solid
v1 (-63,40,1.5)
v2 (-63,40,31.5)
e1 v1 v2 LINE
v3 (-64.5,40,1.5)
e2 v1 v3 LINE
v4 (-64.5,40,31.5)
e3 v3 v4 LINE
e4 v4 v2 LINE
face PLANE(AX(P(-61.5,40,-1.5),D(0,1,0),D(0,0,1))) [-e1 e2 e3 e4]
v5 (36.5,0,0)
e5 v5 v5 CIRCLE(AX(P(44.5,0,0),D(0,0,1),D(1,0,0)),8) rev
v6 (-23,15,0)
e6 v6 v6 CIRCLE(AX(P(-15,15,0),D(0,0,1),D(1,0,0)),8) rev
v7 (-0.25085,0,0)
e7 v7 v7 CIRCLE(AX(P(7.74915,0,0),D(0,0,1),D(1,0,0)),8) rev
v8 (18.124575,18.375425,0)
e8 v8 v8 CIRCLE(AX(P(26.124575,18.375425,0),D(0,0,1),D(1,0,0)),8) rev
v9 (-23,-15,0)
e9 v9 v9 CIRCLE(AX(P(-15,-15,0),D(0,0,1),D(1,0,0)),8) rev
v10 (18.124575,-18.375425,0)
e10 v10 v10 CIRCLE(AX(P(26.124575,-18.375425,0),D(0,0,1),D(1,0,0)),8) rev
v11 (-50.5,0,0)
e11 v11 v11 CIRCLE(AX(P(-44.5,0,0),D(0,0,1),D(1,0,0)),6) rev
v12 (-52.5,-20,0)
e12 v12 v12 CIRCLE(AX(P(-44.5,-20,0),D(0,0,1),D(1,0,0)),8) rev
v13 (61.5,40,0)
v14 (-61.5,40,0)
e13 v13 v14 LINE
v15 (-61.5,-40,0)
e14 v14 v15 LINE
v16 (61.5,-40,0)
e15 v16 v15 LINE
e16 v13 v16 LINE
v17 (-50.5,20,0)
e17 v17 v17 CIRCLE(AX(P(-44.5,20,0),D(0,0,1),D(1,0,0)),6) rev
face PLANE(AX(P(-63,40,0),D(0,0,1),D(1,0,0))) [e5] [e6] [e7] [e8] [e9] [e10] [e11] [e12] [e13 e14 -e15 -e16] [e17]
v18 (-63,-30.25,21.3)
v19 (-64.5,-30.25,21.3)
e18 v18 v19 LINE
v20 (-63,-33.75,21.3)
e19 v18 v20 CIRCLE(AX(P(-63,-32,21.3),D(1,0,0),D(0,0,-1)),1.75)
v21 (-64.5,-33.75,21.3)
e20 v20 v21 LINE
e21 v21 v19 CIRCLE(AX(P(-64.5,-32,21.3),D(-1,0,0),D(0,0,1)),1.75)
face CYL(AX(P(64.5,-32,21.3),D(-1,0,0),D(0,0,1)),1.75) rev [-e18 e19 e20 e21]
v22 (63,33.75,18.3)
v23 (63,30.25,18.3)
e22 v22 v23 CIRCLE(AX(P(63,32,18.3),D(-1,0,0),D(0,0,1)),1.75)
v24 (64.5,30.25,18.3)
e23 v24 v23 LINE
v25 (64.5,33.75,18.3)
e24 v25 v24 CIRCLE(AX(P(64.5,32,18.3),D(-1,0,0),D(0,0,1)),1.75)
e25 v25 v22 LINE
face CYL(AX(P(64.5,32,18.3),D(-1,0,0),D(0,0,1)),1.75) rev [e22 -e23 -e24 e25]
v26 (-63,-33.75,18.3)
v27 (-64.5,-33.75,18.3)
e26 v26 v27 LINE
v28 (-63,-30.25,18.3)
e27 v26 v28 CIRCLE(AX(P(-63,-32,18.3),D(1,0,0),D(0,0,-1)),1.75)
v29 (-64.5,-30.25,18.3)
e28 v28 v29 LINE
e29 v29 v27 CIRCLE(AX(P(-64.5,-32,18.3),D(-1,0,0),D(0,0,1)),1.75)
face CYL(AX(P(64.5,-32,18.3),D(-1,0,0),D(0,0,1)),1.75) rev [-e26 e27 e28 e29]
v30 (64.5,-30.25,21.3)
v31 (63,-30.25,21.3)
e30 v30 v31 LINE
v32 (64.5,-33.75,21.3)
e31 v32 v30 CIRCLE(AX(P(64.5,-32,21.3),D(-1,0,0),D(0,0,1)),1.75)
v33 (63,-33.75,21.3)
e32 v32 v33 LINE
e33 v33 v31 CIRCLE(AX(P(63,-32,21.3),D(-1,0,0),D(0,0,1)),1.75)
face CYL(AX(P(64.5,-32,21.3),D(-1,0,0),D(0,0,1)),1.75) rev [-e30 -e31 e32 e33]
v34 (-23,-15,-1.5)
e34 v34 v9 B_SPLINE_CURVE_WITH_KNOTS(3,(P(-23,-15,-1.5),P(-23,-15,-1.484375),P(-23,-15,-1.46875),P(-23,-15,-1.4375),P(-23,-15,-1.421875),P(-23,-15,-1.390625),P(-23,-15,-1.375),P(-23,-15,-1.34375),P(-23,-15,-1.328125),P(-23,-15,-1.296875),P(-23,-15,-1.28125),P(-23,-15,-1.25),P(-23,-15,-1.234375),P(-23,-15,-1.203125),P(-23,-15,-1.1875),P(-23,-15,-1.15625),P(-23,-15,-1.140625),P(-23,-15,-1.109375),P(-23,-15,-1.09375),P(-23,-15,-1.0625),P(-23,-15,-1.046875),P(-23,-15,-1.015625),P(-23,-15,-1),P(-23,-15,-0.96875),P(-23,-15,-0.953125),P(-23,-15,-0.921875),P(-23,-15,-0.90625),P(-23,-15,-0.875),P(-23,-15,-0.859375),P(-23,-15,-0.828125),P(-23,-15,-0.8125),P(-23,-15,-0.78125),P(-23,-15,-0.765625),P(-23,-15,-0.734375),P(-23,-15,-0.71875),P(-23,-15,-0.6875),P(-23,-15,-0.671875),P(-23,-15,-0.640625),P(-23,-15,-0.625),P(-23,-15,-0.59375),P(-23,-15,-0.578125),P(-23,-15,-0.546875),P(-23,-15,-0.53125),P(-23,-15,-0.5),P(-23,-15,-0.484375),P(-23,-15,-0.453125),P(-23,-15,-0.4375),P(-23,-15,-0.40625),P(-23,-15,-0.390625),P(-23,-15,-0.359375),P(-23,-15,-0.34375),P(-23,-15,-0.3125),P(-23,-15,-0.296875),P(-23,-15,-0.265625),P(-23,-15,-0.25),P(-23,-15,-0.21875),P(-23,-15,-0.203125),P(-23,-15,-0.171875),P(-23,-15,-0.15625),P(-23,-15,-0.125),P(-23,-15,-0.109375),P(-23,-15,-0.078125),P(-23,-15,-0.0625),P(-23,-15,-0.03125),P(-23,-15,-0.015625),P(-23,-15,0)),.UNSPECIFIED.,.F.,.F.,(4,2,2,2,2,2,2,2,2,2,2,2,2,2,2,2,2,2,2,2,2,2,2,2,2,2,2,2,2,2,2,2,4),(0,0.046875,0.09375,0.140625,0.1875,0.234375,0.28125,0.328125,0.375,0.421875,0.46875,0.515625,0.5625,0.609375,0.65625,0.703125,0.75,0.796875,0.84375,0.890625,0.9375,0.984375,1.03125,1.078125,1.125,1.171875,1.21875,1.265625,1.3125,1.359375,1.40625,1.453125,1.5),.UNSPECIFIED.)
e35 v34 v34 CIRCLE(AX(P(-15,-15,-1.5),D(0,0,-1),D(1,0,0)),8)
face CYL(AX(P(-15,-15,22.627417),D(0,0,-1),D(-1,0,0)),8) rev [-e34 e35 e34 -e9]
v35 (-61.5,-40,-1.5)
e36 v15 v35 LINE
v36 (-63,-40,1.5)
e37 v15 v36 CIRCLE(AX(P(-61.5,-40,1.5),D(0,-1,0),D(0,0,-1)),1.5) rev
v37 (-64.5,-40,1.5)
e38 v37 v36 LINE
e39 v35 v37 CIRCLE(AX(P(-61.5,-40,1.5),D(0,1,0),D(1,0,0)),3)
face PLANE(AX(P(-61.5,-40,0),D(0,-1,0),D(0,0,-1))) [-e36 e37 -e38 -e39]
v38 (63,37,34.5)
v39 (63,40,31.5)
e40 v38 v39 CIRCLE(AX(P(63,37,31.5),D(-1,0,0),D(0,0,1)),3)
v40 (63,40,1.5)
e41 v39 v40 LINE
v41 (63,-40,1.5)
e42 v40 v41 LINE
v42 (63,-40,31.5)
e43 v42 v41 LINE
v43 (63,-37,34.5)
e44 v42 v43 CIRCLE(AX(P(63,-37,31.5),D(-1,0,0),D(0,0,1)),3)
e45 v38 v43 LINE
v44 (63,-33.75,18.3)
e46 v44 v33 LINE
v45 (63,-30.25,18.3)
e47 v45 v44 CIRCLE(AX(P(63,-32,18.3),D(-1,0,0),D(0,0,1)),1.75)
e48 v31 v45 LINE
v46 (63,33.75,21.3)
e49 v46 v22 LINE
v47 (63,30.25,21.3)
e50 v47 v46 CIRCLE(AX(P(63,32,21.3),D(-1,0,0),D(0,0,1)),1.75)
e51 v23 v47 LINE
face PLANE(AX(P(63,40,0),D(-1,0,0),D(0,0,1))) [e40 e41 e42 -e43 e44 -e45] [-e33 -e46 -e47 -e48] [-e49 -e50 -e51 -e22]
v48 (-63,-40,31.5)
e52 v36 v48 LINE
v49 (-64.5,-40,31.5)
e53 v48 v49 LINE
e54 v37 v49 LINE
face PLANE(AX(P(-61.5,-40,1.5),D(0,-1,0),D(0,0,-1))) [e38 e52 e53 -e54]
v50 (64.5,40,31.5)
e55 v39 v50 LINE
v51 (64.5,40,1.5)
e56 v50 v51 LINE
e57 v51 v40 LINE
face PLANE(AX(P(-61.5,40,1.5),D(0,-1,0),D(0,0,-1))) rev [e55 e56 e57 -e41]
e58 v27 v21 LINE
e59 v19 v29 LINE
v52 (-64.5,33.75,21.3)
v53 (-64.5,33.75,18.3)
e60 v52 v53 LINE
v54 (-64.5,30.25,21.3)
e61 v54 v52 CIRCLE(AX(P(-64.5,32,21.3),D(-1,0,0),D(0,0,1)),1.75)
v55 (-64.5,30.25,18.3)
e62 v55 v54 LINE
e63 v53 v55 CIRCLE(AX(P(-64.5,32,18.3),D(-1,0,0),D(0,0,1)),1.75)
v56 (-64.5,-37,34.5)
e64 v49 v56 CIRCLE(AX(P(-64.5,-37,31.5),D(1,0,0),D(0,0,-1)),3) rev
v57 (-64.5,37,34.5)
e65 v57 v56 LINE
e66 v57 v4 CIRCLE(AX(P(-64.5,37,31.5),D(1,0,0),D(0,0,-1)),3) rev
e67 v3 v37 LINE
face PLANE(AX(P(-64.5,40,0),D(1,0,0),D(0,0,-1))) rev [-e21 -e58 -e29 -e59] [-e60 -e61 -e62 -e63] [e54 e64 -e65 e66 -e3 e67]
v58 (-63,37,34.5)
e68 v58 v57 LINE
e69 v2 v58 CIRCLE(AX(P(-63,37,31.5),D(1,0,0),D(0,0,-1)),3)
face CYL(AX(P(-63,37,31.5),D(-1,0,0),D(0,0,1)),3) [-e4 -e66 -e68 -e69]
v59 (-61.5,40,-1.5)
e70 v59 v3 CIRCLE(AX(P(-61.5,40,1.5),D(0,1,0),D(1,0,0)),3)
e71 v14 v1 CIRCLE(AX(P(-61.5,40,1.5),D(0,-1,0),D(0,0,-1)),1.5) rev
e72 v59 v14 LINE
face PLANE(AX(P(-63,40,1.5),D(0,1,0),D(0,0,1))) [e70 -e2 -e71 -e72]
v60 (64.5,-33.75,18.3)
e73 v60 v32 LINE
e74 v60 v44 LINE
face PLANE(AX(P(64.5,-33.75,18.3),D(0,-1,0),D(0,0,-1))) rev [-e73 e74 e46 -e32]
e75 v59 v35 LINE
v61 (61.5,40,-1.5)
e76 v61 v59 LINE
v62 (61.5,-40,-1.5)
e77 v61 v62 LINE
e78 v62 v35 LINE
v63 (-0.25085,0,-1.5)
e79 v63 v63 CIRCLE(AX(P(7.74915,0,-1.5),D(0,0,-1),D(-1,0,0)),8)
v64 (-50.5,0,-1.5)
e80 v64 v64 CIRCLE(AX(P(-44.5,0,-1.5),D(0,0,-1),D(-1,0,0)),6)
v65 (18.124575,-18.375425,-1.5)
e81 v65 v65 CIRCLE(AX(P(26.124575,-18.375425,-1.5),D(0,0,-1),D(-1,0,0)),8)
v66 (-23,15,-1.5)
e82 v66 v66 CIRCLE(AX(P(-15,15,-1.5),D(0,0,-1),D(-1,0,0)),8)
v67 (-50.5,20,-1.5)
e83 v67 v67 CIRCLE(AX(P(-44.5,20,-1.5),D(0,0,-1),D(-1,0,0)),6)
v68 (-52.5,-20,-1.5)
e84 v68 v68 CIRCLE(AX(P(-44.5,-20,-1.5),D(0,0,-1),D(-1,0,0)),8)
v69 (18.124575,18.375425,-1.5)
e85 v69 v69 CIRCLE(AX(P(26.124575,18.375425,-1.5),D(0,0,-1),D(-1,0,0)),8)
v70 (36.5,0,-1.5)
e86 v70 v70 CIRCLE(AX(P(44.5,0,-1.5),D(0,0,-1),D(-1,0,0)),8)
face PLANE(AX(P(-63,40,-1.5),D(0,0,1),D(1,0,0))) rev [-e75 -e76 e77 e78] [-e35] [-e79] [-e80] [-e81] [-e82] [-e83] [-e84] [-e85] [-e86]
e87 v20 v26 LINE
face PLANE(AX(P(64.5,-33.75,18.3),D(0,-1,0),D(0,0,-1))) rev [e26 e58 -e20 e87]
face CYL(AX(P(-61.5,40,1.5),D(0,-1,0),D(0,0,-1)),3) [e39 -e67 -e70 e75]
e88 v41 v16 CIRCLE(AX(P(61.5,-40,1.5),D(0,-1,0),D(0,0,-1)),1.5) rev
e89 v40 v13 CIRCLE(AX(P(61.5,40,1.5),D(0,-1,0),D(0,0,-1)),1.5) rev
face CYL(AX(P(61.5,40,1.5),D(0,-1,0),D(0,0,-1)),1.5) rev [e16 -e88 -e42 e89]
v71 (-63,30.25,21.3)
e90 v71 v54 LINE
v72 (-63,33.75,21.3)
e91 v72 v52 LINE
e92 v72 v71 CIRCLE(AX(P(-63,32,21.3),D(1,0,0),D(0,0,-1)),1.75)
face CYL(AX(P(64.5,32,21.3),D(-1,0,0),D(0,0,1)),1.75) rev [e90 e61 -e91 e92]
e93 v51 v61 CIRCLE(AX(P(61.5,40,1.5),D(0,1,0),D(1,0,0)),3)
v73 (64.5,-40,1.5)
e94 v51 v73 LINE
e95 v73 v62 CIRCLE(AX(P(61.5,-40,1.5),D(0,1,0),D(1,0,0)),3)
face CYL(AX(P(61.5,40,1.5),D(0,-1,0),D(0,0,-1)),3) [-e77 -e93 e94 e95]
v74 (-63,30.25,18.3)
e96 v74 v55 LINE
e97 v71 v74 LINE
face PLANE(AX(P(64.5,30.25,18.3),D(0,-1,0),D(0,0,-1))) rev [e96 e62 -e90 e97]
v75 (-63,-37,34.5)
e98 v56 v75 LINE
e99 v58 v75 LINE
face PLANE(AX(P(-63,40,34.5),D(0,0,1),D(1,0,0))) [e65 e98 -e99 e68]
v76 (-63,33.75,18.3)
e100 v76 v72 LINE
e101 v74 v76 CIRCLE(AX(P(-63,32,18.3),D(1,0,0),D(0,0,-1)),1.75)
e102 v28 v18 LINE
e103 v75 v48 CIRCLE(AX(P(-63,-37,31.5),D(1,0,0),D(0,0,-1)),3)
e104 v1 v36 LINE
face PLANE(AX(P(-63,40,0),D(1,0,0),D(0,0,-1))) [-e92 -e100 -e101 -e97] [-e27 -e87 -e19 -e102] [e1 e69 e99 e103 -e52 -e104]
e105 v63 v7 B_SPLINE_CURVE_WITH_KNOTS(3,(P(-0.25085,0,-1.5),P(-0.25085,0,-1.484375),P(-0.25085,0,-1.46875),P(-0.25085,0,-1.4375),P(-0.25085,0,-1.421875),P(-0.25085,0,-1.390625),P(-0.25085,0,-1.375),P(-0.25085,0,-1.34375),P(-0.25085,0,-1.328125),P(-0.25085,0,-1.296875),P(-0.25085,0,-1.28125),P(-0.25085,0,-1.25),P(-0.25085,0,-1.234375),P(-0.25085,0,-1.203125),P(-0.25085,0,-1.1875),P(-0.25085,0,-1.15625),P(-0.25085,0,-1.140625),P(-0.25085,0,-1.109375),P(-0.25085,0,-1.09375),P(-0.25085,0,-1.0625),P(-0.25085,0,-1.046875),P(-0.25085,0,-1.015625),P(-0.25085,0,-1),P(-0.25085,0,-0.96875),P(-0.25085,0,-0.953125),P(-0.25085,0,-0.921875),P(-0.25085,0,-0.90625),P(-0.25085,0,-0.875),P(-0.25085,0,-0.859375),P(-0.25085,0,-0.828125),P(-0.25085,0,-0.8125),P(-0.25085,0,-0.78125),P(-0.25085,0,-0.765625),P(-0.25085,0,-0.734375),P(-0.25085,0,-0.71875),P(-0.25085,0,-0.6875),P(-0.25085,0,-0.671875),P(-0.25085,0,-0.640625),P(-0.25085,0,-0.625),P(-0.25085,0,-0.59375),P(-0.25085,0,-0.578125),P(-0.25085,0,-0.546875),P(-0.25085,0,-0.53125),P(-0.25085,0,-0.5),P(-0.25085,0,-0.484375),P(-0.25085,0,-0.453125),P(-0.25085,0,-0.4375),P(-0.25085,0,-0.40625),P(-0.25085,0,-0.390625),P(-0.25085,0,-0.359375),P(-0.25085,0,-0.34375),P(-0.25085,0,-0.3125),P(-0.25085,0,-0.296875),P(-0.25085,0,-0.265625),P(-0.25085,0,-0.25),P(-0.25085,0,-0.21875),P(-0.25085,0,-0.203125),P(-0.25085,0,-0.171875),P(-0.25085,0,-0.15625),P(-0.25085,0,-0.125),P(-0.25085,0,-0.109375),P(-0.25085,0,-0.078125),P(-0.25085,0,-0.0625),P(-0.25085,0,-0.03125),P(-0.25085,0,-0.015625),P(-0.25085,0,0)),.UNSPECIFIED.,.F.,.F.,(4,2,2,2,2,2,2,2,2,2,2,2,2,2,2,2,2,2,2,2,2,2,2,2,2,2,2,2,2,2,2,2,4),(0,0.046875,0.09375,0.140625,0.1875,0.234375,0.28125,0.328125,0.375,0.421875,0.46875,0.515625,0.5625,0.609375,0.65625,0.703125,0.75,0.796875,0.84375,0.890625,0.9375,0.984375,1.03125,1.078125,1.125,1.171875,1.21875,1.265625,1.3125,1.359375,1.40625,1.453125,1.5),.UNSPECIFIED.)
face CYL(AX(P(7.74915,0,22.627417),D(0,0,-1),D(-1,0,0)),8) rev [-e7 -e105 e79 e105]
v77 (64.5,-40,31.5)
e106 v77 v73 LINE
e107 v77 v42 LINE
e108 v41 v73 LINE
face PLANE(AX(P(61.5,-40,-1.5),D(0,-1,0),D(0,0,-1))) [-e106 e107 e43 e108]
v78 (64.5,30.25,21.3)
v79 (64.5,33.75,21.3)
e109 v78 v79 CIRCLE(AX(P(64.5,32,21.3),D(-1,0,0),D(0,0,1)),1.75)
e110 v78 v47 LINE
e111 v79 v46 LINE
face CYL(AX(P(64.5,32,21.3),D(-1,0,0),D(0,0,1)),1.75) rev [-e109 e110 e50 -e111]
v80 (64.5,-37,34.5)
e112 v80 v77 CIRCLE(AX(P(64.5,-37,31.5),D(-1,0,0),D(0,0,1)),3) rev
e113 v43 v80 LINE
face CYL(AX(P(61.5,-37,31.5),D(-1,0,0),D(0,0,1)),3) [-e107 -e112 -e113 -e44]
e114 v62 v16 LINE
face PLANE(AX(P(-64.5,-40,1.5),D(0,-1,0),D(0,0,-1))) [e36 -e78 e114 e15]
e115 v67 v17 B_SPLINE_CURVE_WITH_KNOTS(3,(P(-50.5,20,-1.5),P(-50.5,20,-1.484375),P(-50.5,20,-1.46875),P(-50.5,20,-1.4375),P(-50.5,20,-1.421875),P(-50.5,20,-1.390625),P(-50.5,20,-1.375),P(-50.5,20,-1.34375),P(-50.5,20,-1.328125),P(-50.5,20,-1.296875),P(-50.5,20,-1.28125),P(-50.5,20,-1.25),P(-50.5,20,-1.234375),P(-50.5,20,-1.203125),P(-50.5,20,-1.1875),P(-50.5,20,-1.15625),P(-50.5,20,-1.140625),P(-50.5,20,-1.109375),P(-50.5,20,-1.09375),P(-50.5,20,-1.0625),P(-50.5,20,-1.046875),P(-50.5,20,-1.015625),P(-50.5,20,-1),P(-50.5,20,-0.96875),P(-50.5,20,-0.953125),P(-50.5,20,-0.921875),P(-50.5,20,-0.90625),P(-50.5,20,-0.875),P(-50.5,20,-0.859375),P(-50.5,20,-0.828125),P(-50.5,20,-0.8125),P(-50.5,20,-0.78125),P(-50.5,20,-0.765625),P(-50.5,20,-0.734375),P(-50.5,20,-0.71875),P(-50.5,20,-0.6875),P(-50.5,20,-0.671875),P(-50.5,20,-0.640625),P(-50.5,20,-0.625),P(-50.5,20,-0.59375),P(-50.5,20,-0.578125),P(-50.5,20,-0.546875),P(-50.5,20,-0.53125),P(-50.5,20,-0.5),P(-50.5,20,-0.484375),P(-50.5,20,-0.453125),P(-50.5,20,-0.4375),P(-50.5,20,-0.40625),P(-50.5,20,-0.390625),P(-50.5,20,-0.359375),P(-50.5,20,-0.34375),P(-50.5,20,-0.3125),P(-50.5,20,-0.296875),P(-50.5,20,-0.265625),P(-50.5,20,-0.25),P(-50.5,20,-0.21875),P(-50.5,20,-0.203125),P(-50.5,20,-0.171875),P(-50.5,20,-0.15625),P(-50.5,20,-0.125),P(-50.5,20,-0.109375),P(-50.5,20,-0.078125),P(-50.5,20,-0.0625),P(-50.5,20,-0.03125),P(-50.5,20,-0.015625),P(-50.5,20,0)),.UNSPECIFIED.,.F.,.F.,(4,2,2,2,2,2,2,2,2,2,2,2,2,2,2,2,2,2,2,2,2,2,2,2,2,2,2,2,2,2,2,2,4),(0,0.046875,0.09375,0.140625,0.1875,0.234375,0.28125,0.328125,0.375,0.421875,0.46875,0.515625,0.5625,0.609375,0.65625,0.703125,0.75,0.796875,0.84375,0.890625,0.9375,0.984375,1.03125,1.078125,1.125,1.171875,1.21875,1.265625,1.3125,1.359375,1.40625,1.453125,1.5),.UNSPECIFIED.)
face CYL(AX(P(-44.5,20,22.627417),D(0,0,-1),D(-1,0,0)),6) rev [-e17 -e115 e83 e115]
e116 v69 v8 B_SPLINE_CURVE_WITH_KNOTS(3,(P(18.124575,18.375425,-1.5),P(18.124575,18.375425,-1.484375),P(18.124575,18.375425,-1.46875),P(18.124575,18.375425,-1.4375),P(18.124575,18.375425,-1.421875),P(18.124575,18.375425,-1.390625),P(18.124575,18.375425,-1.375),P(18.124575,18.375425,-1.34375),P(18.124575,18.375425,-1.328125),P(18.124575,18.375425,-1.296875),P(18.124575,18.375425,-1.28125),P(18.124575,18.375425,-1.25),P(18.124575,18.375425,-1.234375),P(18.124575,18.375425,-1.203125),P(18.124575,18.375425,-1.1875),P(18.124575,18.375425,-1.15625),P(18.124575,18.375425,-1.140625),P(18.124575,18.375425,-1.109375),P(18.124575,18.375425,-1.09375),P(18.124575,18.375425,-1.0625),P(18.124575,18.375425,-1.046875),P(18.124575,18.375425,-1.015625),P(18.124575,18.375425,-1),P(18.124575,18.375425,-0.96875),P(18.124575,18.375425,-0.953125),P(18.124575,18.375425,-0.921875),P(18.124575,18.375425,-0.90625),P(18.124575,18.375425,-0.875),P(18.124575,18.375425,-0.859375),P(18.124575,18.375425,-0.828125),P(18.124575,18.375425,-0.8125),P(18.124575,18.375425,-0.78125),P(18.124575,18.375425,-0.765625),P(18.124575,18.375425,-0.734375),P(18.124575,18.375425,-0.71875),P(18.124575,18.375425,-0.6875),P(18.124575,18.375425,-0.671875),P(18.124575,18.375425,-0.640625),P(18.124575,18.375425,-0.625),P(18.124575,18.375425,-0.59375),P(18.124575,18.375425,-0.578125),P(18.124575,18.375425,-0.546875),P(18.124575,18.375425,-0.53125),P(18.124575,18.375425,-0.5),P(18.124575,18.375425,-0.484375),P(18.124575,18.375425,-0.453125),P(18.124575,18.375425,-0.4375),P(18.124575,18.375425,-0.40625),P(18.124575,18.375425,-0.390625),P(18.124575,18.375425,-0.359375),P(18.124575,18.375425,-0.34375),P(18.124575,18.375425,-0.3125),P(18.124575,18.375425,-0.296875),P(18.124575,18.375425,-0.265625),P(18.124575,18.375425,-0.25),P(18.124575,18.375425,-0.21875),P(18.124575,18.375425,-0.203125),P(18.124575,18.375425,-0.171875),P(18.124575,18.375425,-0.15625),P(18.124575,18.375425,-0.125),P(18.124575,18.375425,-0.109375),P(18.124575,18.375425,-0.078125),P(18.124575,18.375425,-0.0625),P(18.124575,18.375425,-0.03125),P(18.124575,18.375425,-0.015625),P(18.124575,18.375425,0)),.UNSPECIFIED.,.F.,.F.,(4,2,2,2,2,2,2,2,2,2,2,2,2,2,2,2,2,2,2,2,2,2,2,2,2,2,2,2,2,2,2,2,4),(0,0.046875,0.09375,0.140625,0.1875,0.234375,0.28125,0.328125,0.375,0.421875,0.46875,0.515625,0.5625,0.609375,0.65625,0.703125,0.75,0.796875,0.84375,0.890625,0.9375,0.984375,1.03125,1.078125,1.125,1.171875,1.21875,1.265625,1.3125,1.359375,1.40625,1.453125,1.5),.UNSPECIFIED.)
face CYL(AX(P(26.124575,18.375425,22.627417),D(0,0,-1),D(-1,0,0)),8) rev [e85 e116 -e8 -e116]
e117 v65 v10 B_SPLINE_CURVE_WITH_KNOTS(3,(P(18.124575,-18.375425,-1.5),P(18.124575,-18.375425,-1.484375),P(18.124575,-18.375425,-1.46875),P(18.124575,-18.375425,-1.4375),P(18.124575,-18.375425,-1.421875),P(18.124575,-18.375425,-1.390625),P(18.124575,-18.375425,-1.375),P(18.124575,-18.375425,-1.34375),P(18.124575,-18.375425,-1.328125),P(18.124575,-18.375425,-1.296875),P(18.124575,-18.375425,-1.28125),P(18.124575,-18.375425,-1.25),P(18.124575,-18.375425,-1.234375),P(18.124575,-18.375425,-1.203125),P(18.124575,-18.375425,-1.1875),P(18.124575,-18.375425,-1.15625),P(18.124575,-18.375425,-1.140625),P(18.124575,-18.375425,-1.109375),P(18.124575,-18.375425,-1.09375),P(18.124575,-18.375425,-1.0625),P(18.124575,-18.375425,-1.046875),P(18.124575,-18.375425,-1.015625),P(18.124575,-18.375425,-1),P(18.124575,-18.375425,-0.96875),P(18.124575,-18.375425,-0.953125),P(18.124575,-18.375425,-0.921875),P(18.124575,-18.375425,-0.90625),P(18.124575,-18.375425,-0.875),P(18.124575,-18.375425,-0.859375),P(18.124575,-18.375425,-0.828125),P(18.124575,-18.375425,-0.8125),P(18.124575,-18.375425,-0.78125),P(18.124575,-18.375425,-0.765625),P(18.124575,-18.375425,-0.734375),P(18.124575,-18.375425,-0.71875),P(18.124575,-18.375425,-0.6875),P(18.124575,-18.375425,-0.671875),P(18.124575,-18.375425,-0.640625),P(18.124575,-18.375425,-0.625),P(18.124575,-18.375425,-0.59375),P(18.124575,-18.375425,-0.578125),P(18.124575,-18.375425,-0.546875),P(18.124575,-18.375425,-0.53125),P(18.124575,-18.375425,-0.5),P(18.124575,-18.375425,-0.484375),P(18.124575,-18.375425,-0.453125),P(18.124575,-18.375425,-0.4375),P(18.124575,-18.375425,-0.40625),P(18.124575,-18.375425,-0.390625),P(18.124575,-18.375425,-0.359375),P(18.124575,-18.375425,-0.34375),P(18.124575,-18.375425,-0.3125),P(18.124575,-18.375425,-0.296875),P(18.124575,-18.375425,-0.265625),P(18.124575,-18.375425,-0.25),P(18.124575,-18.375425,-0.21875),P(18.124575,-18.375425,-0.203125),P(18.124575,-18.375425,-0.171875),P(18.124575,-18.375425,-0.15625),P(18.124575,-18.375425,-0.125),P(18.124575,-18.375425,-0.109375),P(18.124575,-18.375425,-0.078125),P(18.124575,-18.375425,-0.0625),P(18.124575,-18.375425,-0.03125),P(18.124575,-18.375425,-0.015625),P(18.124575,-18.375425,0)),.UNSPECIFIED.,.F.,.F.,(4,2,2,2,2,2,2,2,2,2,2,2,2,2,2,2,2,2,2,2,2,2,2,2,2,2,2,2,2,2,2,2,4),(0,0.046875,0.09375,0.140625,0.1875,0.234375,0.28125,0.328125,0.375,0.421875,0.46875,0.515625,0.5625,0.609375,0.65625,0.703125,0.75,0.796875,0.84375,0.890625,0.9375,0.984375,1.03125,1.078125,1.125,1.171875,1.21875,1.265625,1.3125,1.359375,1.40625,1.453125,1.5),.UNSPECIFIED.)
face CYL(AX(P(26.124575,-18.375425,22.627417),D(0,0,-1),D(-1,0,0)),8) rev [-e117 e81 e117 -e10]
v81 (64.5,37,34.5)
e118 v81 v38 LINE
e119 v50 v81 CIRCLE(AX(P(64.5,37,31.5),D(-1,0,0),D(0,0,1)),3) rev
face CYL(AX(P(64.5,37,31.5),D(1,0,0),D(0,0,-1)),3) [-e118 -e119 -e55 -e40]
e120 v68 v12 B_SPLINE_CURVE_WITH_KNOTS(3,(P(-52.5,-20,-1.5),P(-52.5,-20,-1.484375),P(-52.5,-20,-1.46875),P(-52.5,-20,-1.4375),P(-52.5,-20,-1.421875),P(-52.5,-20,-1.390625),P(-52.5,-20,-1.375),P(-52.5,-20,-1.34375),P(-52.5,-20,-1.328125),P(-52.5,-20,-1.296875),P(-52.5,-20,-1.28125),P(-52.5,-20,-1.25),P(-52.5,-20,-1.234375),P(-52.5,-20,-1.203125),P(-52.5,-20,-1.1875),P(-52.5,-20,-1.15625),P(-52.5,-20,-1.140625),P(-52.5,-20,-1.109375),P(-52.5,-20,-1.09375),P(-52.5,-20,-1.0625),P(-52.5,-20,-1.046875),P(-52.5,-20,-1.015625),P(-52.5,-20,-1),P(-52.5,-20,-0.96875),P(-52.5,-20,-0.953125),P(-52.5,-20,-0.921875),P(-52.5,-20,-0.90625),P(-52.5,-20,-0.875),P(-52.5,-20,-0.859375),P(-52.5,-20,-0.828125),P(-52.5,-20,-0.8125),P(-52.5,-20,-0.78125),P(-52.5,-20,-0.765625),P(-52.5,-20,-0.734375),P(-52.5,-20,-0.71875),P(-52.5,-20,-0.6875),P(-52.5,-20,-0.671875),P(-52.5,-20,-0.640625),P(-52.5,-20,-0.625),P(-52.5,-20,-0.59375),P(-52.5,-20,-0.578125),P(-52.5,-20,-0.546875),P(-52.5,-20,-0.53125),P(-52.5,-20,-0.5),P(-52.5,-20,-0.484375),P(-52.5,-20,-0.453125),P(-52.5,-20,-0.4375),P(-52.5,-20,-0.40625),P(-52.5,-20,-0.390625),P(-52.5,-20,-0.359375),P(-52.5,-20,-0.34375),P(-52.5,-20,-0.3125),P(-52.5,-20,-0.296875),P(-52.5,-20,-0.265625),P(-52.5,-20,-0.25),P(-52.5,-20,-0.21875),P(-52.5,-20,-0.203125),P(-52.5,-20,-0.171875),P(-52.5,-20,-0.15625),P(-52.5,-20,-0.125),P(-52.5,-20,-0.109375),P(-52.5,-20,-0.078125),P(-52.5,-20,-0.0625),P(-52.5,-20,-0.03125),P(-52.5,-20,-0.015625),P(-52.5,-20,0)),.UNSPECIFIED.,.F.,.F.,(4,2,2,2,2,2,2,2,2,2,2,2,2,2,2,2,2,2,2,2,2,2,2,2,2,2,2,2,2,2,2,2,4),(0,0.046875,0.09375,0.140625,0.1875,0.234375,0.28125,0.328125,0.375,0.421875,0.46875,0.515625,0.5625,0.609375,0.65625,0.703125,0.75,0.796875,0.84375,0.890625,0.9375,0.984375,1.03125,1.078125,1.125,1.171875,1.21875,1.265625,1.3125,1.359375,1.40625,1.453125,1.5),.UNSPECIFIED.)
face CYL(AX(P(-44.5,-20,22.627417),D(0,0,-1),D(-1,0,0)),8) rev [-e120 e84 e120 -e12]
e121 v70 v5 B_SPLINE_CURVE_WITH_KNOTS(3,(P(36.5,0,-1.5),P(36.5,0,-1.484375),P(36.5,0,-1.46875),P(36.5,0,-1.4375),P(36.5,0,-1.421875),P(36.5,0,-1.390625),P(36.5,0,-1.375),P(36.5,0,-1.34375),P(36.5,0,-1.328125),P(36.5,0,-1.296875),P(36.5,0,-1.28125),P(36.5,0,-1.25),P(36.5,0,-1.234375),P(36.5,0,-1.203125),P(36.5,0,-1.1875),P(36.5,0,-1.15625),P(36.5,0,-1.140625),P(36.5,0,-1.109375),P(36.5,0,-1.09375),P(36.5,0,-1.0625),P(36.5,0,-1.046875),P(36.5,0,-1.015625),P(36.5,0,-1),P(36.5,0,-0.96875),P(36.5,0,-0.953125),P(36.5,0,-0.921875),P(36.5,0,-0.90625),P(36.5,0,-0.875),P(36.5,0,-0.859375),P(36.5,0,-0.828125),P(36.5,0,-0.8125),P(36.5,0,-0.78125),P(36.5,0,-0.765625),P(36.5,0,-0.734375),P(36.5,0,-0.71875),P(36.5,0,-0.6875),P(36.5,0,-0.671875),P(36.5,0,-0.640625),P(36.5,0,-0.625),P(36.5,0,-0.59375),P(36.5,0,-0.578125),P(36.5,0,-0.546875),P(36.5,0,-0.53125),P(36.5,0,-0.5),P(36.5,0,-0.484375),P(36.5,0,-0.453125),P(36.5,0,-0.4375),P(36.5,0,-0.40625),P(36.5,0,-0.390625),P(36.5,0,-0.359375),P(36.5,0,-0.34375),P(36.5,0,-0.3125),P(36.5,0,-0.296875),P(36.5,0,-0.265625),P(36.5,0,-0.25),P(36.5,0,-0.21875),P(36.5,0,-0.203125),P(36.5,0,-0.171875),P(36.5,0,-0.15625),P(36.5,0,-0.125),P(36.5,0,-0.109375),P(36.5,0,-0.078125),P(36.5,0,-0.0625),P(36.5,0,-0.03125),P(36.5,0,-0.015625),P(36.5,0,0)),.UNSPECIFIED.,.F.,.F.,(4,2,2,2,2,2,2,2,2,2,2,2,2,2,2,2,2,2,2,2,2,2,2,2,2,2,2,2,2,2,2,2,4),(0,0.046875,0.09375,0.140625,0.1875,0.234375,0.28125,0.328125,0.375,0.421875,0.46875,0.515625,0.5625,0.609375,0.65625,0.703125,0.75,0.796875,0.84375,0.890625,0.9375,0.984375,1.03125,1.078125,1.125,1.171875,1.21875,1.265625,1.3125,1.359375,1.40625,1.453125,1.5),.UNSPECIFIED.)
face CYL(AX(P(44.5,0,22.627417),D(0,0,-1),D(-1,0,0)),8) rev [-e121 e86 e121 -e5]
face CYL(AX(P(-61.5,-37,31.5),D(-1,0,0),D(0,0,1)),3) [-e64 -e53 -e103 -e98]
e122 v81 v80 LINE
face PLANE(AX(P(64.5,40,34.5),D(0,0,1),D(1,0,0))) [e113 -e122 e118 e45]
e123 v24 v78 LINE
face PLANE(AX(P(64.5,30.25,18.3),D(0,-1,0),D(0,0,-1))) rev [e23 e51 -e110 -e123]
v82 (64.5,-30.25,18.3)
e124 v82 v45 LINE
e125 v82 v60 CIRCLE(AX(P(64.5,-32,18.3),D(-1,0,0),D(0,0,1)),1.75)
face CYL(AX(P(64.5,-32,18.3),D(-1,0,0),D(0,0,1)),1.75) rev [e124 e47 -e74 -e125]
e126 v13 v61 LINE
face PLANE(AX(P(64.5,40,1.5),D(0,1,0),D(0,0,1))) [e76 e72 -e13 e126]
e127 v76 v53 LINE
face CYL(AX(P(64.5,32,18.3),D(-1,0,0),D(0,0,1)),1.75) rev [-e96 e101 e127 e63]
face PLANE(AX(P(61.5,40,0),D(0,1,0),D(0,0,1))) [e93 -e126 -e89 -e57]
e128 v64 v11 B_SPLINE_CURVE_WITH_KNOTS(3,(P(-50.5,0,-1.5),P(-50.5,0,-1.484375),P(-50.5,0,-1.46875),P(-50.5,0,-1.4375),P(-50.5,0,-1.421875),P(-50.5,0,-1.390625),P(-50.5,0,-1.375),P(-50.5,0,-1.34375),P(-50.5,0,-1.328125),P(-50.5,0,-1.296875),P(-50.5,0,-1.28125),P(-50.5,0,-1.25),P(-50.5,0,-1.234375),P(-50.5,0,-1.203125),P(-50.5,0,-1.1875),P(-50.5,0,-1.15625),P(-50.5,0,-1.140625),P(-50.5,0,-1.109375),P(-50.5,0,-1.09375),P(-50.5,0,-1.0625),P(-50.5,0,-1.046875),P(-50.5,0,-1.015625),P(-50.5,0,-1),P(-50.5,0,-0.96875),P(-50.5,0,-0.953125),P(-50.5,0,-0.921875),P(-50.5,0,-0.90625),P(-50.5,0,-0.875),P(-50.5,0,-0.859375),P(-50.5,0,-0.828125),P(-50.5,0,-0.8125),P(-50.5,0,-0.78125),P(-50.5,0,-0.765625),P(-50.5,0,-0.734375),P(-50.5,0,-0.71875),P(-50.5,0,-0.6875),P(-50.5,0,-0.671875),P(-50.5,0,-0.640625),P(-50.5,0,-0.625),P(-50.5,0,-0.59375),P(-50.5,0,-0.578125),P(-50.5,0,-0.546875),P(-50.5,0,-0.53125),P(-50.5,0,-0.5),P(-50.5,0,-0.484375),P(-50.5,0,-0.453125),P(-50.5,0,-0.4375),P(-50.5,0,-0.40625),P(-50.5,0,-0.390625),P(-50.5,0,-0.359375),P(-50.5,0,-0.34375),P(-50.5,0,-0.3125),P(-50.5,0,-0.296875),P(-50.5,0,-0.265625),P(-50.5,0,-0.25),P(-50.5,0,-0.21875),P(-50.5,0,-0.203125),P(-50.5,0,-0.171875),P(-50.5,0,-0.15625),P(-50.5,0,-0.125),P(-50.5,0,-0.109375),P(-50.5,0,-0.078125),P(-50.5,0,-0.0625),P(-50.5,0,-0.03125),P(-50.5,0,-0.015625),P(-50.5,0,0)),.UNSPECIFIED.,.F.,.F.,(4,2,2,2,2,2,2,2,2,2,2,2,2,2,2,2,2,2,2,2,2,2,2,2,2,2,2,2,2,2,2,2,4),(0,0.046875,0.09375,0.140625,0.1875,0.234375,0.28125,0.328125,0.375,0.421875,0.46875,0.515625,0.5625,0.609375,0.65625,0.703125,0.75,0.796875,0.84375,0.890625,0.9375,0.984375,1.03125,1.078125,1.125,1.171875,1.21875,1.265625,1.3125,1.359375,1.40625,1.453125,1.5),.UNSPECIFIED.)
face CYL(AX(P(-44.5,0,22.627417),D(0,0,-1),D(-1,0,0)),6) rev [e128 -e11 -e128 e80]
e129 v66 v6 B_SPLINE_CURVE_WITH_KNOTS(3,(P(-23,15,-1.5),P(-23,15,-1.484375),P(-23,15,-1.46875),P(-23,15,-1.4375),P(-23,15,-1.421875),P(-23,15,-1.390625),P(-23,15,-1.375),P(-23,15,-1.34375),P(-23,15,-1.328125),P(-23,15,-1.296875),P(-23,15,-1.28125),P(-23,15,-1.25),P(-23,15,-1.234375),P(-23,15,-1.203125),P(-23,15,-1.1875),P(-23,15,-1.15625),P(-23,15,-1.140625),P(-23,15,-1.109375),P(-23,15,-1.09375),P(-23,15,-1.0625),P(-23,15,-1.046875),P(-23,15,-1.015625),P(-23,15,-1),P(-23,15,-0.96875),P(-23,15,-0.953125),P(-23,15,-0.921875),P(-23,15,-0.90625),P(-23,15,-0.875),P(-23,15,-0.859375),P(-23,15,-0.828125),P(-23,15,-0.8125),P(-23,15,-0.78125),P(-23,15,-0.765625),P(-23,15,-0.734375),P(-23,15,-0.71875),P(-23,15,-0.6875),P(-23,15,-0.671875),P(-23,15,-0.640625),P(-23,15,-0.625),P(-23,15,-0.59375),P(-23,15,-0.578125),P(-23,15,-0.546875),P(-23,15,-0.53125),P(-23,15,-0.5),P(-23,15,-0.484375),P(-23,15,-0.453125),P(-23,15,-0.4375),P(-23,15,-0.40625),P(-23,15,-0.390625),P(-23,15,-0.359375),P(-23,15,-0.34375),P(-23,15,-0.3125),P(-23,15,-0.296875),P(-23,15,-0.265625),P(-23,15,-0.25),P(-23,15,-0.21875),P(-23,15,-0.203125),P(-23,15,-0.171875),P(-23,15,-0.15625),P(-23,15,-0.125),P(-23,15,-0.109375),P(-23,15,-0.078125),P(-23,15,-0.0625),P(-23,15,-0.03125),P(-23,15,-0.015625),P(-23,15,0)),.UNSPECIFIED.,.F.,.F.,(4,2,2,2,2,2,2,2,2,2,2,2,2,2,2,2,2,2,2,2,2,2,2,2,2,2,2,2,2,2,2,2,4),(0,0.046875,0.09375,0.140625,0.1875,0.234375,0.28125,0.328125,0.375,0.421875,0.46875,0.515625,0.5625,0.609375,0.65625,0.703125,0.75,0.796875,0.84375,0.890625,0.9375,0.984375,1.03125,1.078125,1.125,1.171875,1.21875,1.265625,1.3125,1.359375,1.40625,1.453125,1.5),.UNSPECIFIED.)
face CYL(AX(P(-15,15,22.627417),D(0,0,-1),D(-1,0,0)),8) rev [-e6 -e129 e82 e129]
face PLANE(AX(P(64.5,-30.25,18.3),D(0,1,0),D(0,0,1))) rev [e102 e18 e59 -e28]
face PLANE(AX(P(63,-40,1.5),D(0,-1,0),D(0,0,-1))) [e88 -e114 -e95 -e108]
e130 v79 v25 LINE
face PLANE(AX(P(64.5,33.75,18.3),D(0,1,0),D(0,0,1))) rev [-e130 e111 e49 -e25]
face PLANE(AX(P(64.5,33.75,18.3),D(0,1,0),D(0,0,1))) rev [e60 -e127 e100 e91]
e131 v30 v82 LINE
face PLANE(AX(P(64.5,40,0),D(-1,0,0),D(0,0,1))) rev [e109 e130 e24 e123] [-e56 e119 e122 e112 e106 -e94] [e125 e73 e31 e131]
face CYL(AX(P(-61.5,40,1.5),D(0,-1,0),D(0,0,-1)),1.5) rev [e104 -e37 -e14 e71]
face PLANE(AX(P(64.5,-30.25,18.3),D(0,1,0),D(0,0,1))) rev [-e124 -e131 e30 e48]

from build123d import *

# Parameters (mm, degrees)
FLANGE_BASE1_DEPTH    = 40
ESBO_O4_R             = 6
ESBO_O4_R_2           = 8
CORTE_EXTRUS_O1_DEPTH = 1.5
FILETE1_R             = 3
CORTE_EXTRUS_O2_DEPTH = 140.396018595


# Sheet-metal steps are written as plain solids
with BuildPart() as part:
    # Esboço2 → Flange-base1 (new, symmetric)
    with BuildSketch(Plane(origin=(0, 0, 0), x_dir=(1, 0, 0), z_dir=(0, 1, 0))):
        with BuildLine():
            Line((-63, -34.5), (-63, -1.5))
            ThreePointArc((-63, -1.5), (-62.560660172, -0.439339828), (-61.5, 0))
            Line((-61.5, 0), (61.5, 0))
            ThreePointArc((61.5, 0), (62.560660172, -0.439339828), (63, -1.5))
            Line((63, -1.5), (63, -34.5))
            Line((63, -34.5), (64.5, -34.5))
            Line((64.5, -34.5), (64.5, -1.5))
            ThreePointArc((64.5, -1.5), (63.621320344, 0.621320344), (61.5, 1.5))
            Line((61.5, 1.5), (-61.5, 1.5))
            ThreePointArc((-61.5, 1.5), (-63.621320344, 0.621320344), (-64.5, -1.5))
            Line((-64.5, -1.5), (-64.5, -34.5))
            Line((-64.5, -34.5), (-63, -34.5))
        make_face()
    extrude(amount=FLANGE_BASE1_DEPTH, both=True)

    # Esboço4 → Corte-extrusão1 (cut)
    with BuildSketch(Plane(origin=(0, 0, -1.5), x_dir=(-1, 0, 0), z_dir=(0, 0, -1))):
        with Locations((44.5, 0)):
            Circle(ESBO_O4_R)
        with Locations((44.5, -20)):
            Circle(ESBO_O4_R_2)
        with Locations((44.5, 20)):
            Circle(ESBO_O4_R)
        with Locations((15, 15)):
            Circle(ESBO_O4_R_2)
        with Locations((-44.5, 0)):
            Circle(ESBO_O4_R_2)
        with Locations((-26.124574835, 18.375425165)):
            Circle(ESBO_O4_R_2)
        with Locations((-7.74914967, 0)):
            Circle(ESBO_O4_R_2)
        with Locations((-26.124574835, -18.375425165)):
            Circle(ESBO_O4_R_2)
        with Locations((15, -15)):
            Circle(ESBO_O4_R_2)
    extrude(amount=-CORTE_EXTRUS_O1_DEPTH, mode=Mode.SUBTRACT)

    # Filete1
    filete1_edges = [part.edges().sort_by_distance(p)[0] for p in [
        (63.75, -40, 34.5),
        (-63.75, -40, 34.5),
        (63.75, 40, 34.5),
        (-63.75, 40, 34.5),
    ]]
    fillet(filete1_edges, radius=FILETE1_R)

    # Esboço5 → Corte-extrusão2 (cut, through all)
    with BuildSketch(Plane.ZY.offset(64.5)):
        with BuildLine():
            Line((18.3, 33.75), (21.3, 33.75))
            ThreePointArc((21.3, 33.75), (23.05, 32), (21.3, 30.25))
            Line((21.3, 30.25), (18.3, 30.25))
            ThreePointArc((18.3, 30.25), (16.55, 32), (18.3, 33.75))
        make_face()
        with BuildLine():
            Line((18.3, -30.25), (21.3, -30.25))
            ThreePointArc((21.3, -30.25), (23.05, -32), (21.3, -33.75))
            Line((21.3, -33.75), (18.3, -33.75))
            ThreePointArc((18.3, -33.75), (16.55, -32), (18.3, -30.25))
        make_face()
    extrude(amount=-CORTE_EXTRUS_O2_DEPTH, mode=Mode.SUBTRACT)


solid = part.part
